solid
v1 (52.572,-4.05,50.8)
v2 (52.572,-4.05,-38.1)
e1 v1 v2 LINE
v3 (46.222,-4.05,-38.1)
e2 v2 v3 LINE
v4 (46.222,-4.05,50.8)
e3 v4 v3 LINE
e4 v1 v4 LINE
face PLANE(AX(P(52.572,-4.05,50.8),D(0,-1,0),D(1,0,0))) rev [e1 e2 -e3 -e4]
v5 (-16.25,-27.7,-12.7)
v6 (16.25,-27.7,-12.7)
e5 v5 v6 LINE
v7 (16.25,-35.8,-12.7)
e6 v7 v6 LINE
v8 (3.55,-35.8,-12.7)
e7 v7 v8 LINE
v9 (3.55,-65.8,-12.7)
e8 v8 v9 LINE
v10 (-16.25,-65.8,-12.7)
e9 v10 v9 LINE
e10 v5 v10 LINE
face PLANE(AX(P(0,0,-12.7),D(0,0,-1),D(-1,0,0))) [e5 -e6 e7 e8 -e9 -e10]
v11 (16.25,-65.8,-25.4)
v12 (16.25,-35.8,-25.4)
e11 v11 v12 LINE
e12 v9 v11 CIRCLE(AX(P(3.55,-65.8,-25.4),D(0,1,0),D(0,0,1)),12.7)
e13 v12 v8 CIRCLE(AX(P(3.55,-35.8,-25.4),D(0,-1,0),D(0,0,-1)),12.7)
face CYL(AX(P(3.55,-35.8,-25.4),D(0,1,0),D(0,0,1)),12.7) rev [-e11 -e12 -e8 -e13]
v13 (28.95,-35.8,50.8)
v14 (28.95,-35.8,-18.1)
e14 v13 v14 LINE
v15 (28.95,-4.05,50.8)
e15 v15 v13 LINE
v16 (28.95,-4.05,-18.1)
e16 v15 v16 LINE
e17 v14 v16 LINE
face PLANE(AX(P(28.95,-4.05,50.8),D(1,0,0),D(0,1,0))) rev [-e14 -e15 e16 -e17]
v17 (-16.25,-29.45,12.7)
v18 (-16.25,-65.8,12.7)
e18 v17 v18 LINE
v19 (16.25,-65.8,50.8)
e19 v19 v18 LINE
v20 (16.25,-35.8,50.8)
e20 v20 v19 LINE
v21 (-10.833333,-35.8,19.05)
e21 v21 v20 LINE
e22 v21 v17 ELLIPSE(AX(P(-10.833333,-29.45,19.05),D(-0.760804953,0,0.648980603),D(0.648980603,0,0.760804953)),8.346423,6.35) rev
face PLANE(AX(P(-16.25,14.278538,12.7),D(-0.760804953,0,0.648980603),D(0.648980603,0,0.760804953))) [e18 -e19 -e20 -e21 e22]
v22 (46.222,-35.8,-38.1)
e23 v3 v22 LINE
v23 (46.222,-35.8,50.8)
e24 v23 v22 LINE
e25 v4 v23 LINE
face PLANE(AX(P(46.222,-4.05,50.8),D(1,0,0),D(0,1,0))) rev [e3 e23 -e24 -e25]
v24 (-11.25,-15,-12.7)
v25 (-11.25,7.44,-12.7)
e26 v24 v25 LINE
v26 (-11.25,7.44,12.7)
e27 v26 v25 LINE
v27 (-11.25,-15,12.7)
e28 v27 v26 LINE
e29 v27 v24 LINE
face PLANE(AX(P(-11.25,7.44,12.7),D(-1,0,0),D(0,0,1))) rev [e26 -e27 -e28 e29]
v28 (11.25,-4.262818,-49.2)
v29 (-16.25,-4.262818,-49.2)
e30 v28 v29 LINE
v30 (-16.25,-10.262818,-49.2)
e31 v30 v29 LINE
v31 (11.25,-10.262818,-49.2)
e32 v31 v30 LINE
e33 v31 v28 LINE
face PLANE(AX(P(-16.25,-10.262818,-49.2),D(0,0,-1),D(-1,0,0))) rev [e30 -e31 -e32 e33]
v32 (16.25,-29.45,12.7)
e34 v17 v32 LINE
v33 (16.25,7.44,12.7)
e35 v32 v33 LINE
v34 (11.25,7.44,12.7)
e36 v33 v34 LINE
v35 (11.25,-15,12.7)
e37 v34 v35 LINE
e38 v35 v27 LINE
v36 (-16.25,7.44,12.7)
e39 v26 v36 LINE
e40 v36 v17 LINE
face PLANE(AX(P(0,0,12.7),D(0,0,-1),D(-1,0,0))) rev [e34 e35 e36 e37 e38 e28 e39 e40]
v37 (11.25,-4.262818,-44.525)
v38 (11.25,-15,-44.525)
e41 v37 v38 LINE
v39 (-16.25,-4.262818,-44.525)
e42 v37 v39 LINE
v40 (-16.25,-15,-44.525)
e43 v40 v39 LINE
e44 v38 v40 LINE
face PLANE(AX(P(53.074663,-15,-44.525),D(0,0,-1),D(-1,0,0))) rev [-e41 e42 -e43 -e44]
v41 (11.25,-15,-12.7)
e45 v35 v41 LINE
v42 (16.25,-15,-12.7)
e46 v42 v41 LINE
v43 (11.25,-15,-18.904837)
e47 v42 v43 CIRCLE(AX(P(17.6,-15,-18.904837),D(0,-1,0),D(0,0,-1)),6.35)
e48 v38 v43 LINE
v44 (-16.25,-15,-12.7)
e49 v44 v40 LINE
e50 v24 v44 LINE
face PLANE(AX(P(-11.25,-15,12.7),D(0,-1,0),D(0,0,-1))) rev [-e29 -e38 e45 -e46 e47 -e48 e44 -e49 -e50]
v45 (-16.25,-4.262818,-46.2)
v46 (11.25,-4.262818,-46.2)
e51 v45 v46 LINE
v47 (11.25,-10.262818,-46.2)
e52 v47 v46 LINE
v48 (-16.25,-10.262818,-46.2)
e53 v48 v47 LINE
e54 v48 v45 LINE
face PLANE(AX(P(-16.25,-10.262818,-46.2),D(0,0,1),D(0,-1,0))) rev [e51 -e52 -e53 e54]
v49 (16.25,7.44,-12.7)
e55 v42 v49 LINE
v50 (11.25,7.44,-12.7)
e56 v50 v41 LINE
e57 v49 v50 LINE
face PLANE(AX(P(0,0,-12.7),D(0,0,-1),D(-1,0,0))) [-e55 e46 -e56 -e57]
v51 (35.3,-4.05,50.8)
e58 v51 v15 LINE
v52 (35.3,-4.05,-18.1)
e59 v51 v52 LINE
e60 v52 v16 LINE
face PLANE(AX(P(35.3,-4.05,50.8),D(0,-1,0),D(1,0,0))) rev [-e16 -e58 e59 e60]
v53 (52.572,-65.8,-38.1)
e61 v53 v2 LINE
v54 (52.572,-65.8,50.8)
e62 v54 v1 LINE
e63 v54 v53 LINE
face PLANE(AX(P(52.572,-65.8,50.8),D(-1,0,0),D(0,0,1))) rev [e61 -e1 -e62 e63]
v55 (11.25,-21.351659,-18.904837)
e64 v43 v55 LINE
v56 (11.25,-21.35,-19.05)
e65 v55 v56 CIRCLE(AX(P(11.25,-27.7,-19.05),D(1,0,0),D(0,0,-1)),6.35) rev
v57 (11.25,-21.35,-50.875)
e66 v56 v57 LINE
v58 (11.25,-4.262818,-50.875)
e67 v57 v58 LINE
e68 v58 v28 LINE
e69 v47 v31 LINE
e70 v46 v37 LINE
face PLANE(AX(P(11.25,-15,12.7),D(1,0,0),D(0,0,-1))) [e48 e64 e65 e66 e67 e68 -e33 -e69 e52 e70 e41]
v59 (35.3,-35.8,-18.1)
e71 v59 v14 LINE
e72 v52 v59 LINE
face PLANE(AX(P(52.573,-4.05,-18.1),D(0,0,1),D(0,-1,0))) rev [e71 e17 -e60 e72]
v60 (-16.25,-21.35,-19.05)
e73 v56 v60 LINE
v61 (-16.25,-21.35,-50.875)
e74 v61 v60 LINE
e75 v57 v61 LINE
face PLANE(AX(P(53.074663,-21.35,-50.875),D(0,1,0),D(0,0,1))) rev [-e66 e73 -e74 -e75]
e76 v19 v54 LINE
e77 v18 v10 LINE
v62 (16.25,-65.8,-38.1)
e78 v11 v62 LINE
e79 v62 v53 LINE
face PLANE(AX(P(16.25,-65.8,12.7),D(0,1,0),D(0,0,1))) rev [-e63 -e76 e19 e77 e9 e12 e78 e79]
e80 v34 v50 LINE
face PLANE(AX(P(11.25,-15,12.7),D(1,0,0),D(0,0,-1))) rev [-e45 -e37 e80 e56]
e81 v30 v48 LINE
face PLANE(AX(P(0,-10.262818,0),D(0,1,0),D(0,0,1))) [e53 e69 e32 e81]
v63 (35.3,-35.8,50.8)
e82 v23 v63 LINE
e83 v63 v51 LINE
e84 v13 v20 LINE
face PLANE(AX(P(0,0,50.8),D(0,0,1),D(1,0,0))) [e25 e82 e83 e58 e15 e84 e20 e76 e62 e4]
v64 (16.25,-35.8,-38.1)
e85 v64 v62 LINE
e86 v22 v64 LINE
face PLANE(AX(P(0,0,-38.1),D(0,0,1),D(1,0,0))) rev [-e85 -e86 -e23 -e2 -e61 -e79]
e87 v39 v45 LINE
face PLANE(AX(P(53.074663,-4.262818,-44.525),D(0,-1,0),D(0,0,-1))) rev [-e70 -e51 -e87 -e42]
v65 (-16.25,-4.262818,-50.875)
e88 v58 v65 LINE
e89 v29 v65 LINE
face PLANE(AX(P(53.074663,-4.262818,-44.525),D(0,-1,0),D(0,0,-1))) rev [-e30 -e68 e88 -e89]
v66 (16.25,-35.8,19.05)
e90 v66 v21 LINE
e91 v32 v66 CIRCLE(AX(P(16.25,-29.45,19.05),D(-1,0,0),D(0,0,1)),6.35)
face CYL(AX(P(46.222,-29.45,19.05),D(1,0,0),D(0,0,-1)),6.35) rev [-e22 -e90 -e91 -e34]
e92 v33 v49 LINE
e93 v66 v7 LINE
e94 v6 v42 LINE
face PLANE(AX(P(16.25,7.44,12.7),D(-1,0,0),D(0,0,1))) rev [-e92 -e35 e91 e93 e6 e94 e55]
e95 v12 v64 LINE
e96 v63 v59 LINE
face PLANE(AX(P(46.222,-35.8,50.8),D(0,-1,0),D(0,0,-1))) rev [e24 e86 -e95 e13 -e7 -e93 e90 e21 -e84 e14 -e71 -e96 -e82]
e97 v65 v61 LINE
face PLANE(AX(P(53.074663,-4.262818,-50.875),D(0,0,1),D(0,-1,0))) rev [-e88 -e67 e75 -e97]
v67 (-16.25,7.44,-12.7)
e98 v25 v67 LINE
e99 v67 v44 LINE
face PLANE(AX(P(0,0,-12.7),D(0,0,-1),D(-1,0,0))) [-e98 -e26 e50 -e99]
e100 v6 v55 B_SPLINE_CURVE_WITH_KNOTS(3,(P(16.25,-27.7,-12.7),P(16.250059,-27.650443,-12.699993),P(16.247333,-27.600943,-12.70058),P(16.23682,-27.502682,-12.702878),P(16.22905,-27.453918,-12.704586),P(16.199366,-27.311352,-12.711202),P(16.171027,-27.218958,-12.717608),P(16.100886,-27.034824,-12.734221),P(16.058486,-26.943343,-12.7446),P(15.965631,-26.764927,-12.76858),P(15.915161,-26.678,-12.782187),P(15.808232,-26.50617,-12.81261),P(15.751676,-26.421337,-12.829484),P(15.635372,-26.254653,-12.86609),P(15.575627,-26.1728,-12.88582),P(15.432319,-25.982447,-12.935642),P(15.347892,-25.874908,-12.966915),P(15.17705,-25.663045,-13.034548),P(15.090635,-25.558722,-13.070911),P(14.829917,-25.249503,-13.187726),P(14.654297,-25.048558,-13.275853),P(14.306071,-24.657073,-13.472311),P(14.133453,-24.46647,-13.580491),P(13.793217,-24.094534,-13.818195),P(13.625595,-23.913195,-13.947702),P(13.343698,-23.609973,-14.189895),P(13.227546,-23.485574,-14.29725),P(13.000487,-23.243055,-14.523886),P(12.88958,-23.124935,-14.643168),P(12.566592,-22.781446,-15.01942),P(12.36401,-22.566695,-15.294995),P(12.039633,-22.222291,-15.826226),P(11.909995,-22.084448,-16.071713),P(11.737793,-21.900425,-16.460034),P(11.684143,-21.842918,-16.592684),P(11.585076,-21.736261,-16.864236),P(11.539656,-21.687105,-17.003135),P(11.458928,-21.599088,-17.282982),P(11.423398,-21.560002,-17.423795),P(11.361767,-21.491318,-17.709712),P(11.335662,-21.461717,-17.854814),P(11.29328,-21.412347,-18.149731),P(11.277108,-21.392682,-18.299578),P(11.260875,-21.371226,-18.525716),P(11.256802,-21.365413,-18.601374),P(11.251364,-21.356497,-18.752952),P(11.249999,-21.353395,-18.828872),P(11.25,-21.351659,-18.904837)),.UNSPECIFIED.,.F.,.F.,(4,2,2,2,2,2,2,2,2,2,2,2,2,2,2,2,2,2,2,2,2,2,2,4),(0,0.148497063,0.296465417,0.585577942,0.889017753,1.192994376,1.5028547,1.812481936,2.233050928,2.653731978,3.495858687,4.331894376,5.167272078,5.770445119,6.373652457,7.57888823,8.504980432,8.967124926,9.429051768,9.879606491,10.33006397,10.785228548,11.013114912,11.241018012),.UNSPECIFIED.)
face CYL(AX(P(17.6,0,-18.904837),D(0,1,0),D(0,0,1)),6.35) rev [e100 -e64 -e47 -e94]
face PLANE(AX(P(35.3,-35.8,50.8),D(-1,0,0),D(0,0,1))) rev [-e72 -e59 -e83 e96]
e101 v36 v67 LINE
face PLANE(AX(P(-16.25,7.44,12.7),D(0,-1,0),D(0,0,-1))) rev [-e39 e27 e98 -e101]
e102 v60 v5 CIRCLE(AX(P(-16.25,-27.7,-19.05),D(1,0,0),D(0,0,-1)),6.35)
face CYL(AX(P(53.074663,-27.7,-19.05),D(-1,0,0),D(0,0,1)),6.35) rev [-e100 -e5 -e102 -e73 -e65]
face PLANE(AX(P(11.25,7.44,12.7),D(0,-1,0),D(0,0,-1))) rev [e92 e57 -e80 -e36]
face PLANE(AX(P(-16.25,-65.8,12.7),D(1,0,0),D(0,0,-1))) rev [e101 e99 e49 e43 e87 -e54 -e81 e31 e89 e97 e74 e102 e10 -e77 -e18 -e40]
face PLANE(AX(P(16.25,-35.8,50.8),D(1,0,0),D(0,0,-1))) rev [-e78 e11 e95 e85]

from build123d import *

# Parameters (mm, degrees)
BOSS_EXTRUDE1_DEPTH             = 12.7
BOSS_EXTRUDE2_REACH             = 70.956
BOSS_EXTRUDE2_DIRECTION_2_REACH = 70.956
SKETCH5_W                       = 27.5
SKETCH5_H                       = 3
CUT_EXTRUDE1_DEPTH              = 6
FILLET2_R                       = 6.35
FILLET3_START                   = -16.25
FILLET3_DEPTH                   = 32.5
FILLET3_START_2                 = -29
FILLET3_2_DEPTH                 = 7.65
BOSS_EXTRUDE3_DEPTH             = 38.1
BOSS_EXTRUDE3_DEPTH_BACK        = 50.8
CUT_EXTRUDE2_REACH              = 96.662
SKETCH7_W                       = 20
SKETCH7_H                       = 31.75
FILLET4_R                       = 12.7
BOSS_EXTRUDE4_DEPTH             = 30
FILLET6_R                       = 6.35


with BuildPart() as part:
    # Sketch2 → Boss-Extrude1 (new, symmetric)
    with BuildSketch(Plane.XY):
        Polygon((-11.25, 7.44), (-11.25, -15), (11.25, -15), (11.25, 7.44), (16.25, 7.44), (16.25, -65.8), (-16.25, -65.8), (-16.25, 7.44), align=None)
    extrude(amount=BOSS_EXTRUDE1_DEPTH, both=True)

    # Boss-Extrude2: up to this face of the body (flat: up to its plane)
    boss_extrude2_end = Plane(part.part.faces().sort_by_distance((11.25, -3.78, 0))[0])
    # Sketch4 → Boss-Extrude2 (add, up to the picked face)
    with BuildSketch(Plane(origin=(0, 0, 0), x_dir=(0, 0, -1), z_dir=(1, 0, 0)), mode=Mode.PRIVATE) as boss_extrude2_sk1:
        Polygon((12.7, -15), (44.525, -15), (44.525, -4.262817999), (50.875, -4.262817999), (50.875, -21.35), (12.7, -21.35), align=None)
    boss_extrude2_tool1 = split(extrude(boss_extrude2_sk1.sketch, amount=BOSS_EXTRUDE2_REACH, mode=Mode.PRIVATE), bisect_by=boss_extrude2_end, keep=Keep.BOTH, mode=Mode.PRIVATE)
    add(boss_extrude2_tool1.solids().sort_by(Axis((0, -16.299514, -35.280605), (1, 0, 0)))[0])

    # Boss-Extrude2 direction 2: up to this face of the body (flat: up to its plane)
    boss_extrude2_direction_2_end = Plane(part.part.faces().sort_by_distance((-16.25, -29.18, 0))[0])
    # Sketch4 → Boss-Extrude2 direction 2 (add, up to the picked face)
    with BuildSketch(Plane(origin=(0, 0, 0), x_dir=(0, 0, -1), z_dir=(1, 0, 0)), mode=Mode.PRIVATE) as boss_extrude2_direction_2_sk1:
        Polygon((12.7, -15), (44.525, -15), (44.525, -4.262817999), (50.875, -4.262817999), (50.875, -21.35), (12.7, -21.35), align=None)
    boss_extrude2_direction_2_tool1 = split(extrude(boss_extrude2_direction_2_sk1.sketch, amount=-BOSS_EXTRUDE2_DIRECTION_2_REACH, mode=Mode.PRIVATE), bisect_by=boss_extrude2_direction_2_end, keep=Keep.BOTH, mode=Mode.PRIVATE)
    add(boss_extrude2_direction_2_tool1.solids().sort_by(Axis((0, -16.299514, -35.280605), (-1, 0, 0)))[0])

    # Sketch5 → Cut-Extrude1 (cut)
    with BuildSketch(Plane(origin=(0, -4.262817999, 0), x_dir=(1, 0, 0), z_dir=(0, 1, 0))):
        with Locations((-2.5, 47.7)):
            Rectangle(SKETCH5_W, SKETCH5_H)
    extrude(amount=-CUT_EXTRUDE1_DEPTH, mode=Mode.SUBTRACT)

    # Fillet2
    # the kernel refuses this fillet: 6.35 mm, written as the material it adds along each edge
    with BuildSketch(Plane(origin=(11.25, -15, -12.7), x_dir=(0, 0, -1), z_dir=(0, -1, 0))) as fillet2_piece_1:
        with BuildLine():
            CenterArc((6.204836823, 6.35), FILLET2_R, 192.274670215, 77.725329785)
            Line((0, 5), (0, 0))
            Line((0, 0), (6.204836823, 0))
        make_face()
    extrude(amount=6.35)

    # Fillet3: read off the stored shape, not the designer's step
    # Fillet3 outline → Fillet3 (add)
    with BuildSketch(Plane.YZ.offset(FILLET3_START)):
        with BuildLine():
            Line((-21.35, -12.7), (-27.7, -12.7))
            ThreePointArc((-27.7, -12.7), (-23.209871939, -14.559871939), (-21.35, -19.05))
            Line((-21.35, -19.05), (-21.35, -12.7))
        make_face()
    extrude(amount=FILLET3_DEPTH)

    # Fillet3 2 outline → Fillet3 2 (cut)
    with BuildSketch(Plane(origin=(0, 0, 0), x_dir=(1, 0, 0), z_dir=(0, 1, 0)).offset(FILLET3_START_2)):
        with BuildLine():
            Line((11.25, 21), (11.25, 18.904836823))
            ThreePointArc((11.25, 18.904836823), (12.655571335, 14.920476752), (16.250039425, 12.699991422))
            Line((16.250039425, 12.699991422), (18, 12.319260294))
            Line((18, 12.319260294), (18, 21))
            Line((18, 21), (11.25, 21))
        make_face()
    extrude(amount=FILLET3_2_DEPTH, mode=Mode.SUBTRACT)

    # Sketch6 → Boss-Extrude3 (add, two sides: drawn at the far end of the back side and taken through both)
    with BuildSketch(Plane.XY.offset(12.7).offset(-BOSS_EXTRUDE3_DEPTH_BACK)):
        Polygon((16.25, -65.8), (52.572, -65.8), (52.572, -4.05), (46.222, -4.05), (46.222, -35.8), (35.3, -35.8), (35.3, -4.05), (28.95, -4.05), (28.95, -35.8), (16.25, -35.8), align=None)
    extrude(amount=BOSS_EXTRUDE3_DEPTH + BOSS_EXTRUDE3_DEPTH_BACK)

    # Sketch7 → Cut-Extrude2 (cut, up to next)
    with BuildSketch(Plane.ZY.offset(-28.95), mode=Mode.PRIVATE) as cut_extrude2_sk1:
        with Locations((-28.1, -19.925)):
            Rectangle(SKETCH7_W, SKETCH7_H)
    cut_extrude2_tool1 = extrude(cut_extrude2_sk1.sketch, amount=-CUT_EXTRUDE2_REACH, mode=Mode.PRIVATE) & part.part
    add(cut_extrude2_tool1.solids().sort_by_distance((28.95, -19.925, -28.1))[0], mode=Mode.SUBTRACT)

    # Fillet4
    fillet4_edges = [part.edges().sort_by_distance(p)[0] for p in [
        (16.25, -50.8, -12.7),
    ]]
    fillet(fillet4_edges, radius=FILLET4_R)

    # Sketch8 → Boss-Extrude4 (add)
    with BuildSketch(Plane.XZ.offset(65.8)):
        Polygon((-16.25, 12.7), (16.25, 50.8), (16.25, 12.7), align=None)
    extrude(amount=-BOSS_EXTRUDE4_DEPTH)

    # Fillet6
    fillet6_edges = [part.edges().sort_by_distance(p)[0] for p in [
        (0, -35.8, 12.7),
    ]]
    fillet(fillet6_edges, radius=FILLET6_R)


solid = part.part
